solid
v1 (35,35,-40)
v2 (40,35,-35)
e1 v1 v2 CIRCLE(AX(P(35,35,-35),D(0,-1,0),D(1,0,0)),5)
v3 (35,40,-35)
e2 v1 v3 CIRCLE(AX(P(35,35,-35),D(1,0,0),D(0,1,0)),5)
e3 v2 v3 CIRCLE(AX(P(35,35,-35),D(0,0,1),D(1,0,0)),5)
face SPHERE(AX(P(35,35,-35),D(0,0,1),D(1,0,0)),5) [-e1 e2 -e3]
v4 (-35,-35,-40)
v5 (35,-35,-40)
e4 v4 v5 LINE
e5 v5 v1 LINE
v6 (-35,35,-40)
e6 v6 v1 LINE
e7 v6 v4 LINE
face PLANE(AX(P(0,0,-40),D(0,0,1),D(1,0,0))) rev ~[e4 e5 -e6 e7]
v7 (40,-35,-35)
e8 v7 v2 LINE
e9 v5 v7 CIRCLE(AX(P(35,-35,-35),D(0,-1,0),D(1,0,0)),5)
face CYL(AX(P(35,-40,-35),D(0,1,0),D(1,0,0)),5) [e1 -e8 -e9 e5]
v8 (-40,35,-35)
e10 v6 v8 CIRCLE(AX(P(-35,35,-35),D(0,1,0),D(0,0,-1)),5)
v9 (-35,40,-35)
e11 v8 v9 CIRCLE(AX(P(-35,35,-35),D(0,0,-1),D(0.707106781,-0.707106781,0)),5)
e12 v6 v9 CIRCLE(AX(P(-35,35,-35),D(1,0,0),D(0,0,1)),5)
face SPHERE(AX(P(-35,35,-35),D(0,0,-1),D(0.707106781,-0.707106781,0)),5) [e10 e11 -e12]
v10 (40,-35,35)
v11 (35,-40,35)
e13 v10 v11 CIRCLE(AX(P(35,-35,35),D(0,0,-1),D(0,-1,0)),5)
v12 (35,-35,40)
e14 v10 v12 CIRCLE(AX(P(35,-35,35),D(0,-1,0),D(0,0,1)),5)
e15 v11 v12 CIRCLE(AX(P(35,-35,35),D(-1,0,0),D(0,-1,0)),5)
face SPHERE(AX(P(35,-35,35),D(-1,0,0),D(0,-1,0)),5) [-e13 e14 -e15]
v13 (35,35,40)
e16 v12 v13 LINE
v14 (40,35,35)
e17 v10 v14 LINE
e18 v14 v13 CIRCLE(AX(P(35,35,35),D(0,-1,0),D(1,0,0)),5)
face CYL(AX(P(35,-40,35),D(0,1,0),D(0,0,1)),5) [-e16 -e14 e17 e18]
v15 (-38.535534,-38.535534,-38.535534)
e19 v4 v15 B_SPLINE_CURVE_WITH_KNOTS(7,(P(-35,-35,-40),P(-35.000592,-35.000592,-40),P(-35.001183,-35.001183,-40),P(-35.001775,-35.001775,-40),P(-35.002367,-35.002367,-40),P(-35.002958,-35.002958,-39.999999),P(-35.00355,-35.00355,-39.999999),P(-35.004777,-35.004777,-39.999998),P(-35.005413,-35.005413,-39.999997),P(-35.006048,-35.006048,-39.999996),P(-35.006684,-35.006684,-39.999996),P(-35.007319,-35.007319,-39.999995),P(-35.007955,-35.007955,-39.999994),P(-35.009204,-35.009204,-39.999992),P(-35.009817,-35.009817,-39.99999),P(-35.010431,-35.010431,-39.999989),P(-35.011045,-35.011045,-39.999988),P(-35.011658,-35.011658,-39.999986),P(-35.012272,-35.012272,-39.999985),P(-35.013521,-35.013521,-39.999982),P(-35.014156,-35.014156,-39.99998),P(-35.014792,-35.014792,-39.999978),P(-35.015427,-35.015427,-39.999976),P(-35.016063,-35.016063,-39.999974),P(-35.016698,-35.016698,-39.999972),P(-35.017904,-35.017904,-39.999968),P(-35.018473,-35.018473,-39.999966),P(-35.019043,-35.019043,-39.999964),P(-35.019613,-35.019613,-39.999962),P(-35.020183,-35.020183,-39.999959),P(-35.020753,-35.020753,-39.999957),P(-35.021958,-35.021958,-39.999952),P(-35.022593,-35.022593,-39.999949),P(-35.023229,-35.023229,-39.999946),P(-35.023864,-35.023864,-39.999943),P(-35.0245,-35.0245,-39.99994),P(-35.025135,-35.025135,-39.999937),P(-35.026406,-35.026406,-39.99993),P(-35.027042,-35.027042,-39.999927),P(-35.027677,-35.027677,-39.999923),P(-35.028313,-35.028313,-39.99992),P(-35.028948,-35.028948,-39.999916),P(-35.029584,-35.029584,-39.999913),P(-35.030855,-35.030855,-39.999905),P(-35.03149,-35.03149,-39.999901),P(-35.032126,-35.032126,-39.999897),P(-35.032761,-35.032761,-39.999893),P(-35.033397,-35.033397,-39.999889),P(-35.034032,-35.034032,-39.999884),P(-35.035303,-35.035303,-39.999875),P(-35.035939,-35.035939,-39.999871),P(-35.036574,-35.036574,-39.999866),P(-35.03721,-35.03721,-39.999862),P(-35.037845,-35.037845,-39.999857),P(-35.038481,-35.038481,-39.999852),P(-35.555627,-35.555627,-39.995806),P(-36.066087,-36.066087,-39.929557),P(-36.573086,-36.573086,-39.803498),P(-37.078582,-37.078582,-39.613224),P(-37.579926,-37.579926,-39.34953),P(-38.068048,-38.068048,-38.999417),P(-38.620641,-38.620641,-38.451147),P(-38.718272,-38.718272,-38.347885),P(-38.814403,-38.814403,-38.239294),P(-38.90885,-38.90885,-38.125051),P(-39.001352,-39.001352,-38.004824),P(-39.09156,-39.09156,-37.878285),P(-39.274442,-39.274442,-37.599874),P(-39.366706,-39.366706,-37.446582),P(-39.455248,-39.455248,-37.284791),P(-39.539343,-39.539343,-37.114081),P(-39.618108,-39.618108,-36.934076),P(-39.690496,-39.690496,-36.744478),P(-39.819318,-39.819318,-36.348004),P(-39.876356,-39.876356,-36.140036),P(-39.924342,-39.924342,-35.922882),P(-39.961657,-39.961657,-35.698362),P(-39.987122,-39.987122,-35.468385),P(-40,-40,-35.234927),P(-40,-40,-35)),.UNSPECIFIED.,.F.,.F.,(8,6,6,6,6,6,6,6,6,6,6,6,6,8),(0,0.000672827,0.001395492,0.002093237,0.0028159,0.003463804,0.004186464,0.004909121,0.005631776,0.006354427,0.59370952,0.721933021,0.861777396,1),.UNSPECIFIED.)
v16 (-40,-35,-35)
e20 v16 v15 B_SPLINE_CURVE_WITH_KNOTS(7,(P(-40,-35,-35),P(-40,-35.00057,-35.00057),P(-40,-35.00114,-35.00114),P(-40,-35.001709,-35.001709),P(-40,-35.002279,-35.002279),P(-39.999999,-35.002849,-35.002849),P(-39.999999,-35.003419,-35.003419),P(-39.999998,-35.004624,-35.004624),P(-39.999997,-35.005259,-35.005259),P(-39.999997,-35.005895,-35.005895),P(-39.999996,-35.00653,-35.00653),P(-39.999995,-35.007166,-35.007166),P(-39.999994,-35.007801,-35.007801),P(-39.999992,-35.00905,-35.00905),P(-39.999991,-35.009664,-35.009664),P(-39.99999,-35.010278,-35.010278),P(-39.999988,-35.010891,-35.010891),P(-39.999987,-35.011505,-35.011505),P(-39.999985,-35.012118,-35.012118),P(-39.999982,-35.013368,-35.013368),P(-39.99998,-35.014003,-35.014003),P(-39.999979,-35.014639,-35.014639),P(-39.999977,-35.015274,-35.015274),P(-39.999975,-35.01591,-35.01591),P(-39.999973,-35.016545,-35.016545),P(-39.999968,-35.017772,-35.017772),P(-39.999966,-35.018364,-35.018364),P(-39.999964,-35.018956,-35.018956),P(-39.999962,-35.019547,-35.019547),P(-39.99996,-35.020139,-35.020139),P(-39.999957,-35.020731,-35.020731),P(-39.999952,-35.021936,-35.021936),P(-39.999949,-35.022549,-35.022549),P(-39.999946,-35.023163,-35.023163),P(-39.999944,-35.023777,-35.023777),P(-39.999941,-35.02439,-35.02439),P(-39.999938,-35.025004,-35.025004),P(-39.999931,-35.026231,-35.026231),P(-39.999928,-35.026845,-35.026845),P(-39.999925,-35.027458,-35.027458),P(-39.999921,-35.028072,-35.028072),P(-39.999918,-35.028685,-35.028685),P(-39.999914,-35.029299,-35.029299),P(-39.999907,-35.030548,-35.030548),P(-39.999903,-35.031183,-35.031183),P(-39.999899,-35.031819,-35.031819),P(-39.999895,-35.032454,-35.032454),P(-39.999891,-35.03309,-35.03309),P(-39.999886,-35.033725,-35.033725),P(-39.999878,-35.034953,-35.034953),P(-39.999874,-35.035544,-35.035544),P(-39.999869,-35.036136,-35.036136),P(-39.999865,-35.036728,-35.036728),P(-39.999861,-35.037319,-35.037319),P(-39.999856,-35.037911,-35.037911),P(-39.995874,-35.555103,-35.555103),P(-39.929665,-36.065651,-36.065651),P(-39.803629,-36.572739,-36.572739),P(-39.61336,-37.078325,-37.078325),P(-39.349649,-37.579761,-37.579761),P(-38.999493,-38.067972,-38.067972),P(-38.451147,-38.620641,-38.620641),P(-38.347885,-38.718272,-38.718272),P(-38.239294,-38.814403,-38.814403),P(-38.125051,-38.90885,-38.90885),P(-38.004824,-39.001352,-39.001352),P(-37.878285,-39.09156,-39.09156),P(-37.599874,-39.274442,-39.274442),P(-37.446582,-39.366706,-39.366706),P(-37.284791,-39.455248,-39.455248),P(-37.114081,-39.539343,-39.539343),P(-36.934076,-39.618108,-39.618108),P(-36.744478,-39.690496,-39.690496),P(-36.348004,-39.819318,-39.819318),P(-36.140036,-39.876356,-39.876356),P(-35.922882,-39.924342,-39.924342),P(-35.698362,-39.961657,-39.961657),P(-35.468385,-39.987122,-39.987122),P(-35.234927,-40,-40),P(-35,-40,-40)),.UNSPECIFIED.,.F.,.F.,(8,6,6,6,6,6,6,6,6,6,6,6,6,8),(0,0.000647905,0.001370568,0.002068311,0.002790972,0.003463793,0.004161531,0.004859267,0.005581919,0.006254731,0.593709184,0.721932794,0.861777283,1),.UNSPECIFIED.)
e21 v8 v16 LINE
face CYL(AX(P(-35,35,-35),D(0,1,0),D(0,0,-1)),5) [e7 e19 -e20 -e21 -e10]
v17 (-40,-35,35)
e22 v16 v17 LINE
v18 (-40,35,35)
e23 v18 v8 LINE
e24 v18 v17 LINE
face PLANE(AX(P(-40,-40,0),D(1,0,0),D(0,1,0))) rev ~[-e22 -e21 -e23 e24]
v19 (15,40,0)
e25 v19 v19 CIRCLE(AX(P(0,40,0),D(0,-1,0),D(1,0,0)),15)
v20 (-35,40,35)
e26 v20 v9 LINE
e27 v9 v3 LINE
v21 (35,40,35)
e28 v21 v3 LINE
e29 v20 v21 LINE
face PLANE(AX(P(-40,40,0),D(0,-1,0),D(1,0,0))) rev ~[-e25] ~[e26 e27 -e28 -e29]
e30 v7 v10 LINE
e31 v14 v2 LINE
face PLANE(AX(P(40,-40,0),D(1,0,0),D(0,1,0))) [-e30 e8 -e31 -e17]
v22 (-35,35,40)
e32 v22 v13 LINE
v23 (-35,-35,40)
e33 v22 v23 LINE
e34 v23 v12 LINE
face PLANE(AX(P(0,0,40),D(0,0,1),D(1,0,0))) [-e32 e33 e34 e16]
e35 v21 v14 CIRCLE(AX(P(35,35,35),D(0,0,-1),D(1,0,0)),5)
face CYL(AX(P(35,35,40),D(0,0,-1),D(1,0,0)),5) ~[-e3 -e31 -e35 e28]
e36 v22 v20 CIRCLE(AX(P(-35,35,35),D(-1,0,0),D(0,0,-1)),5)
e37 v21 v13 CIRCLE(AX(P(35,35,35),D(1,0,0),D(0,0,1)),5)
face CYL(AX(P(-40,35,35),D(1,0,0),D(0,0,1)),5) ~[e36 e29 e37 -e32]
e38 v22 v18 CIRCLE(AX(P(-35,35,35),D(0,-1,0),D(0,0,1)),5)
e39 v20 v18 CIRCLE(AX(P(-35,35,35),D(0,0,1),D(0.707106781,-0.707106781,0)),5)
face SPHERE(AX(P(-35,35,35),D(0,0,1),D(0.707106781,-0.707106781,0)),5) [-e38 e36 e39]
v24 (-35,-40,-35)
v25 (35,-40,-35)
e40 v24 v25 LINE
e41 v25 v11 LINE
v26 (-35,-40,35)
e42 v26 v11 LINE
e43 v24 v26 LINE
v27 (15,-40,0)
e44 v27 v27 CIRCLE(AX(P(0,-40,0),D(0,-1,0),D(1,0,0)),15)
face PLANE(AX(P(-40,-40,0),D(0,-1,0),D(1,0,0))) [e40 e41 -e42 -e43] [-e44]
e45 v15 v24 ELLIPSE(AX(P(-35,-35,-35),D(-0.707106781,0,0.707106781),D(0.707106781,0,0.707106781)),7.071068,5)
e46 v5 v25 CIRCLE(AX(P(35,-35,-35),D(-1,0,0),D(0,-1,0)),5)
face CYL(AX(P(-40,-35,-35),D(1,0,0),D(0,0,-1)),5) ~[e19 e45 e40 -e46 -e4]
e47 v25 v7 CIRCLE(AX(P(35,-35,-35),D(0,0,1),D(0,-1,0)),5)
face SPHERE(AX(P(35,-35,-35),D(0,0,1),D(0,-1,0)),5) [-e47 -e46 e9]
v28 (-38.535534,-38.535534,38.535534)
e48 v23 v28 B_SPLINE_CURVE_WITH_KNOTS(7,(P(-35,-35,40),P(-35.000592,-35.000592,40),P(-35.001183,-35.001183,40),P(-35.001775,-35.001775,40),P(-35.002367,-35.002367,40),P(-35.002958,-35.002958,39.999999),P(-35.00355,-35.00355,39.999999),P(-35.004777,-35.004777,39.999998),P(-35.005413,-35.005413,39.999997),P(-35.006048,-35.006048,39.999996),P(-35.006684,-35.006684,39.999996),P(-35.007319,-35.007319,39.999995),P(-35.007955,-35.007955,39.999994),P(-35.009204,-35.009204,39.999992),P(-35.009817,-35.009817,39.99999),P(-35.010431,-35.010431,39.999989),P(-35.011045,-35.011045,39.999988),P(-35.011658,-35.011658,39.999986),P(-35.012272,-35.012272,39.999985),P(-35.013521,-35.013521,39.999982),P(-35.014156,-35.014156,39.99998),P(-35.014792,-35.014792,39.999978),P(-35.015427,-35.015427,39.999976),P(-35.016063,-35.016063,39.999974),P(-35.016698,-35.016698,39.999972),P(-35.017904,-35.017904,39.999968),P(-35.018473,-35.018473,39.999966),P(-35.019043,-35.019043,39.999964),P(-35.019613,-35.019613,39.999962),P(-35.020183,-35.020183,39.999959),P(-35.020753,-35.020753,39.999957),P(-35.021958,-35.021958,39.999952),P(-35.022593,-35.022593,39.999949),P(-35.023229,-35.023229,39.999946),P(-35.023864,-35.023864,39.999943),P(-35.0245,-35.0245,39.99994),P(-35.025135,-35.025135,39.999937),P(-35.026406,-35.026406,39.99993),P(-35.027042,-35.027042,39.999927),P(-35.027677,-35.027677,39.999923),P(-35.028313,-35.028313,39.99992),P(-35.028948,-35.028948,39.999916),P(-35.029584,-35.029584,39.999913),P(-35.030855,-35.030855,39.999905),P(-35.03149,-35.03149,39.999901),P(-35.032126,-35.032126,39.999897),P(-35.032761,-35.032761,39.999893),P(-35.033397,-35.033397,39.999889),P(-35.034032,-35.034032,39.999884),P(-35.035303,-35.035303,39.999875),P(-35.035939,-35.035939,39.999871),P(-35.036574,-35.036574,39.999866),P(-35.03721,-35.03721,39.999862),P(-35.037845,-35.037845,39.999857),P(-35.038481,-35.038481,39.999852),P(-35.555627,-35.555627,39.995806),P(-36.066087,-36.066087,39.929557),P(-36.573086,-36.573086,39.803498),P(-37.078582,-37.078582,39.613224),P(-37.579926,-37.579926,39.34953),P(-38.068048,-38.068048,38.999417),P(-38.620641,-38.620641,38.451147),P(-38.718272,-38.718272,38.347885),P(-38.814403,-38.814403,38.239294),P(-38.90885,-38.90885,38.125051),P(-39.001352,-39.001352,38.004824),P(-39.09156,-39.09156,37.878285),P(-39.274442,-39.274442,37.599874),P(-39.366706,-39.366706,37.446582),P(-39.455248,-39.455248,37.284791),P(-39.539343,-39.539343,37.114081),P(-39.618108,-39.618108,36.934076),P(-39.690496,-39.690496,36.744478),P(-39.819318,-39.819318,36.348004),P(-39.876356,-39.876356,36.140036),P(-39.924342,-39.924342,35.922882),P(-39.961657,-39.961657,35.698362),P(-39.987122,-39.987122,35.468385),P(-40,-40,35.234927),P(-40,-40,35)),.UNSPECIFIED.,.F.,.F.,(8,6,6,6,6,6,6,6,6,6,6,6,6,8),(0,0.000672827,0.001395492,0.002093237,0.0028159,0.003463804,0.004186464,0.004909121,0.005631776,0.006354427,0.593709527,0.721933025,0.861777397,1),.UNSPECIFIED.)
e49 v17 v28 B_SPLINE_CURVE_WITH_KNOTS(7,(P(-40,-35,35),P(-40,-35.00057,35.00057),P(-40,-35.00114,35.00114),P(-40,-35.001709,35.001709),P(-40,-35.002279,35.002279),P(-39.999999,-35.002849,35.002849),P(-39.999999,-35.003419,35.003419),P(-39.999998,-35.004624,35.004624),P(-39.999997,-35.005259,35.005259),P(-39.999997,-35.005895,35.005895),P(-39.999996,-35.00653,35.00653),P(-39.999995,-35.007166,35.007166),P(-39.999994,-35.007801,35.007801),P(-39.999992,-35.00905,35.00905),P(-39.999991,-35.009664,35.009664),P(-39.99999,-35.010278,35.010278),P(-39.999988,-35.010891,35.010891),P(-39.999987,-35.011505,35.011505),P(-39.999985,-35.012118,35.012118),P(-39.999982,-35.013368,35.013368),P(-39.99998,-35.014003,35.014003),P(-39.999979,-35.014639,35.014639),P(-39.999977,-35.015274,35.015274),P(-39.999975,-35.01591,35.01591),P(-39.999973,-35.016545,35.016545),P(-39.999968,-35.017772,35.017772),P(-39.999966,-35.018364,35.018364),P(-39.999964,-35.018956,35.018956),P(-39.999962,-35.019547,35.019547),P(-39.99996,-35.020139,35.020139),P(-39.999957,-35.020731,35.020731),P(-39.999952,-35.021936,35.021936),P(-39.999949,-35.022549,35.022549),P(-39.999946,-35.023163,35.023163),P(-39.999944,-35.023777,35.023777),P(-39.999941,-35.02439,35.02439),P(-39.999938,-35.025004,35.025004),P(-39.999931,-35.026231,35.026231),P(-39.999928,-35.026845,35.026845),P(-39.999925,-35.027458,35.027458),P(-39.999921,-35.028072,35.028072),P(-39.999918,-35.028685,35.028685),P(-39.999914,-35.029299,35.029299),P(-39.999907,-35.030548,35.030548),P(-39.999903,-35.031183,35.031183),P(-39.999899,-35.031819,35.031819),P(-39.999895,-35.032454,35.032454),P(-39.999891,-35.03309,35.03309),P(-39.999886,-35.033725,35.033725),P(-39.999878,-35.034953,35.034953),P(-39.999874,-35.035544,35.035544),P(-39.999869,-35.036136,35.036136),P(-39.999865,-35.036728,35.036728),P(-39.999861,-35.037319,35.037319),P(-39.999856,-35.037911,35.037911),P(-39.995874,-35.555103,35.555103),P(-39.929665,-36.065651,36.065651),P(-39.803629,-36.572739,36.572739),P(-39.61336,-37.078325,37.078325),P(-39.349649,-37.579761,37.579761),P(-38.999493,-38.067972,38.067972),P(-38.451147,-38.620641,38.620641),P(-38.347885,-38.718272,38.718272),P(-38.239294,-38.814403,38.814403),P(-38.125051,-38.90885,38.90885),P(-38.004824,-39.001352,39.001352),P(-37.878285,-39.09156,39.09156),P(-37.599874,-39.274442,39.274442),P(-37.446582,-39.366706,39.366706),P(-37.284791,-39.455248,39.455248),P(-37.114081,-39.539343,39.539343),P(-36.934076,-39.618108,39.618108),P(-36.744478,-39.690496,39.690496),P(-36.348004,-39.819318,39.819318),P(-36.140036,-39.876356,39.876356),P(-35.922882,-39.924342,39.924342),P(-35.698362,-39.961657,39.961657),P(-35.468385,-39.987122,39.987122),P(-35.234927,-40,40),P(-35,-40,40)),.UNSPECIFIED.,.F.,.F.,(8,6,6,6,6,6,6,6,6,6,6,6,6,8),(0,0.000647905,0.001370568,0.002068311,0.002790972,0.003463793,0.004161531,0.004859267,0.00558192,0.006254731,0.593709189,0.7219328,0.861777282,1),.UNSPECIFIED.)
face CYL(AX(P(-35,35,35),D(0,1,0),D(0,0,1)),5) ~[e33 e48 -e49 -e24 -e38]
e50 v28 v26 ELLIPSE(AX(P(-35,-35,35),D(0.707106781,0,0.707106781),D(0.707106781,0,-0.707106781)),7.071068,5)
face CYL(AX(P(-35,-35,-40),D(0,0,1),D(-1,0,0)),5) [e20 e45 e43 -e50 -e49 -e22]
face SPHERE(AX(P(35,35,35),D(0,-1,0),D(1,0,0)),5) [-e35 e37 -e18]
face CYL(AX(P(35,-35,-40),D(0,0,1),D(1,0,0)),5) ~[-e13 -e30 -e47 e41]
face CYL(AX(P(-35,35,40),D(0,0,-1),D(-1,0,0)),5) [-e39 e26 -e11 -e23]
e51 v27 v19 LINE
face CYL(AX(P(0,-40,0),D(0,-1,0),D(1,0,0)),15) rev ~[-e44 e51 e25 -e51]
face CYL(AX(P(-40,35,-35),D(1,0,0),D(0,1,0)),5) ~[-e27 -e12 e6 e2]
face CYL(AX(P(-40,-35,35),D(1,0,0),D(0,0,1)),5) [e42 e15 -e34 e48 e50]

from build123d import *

# Parameters (mm, degrees)
F0_W         = 80
F0_H         = 80
F1_DEPTH     = 40
F2_R         = 5
F3_T1_DEPTH  = 82.5
F3_S5_W      = 5.1
F3_S5_H      = 5.1
F3_T6_DEPTH  = 5.1
F3_S11_W     = 5.1
F3_S11_H     = 5.1
F3_T12_DEPTH = 5.1
F4_R         = 15
F5_DEPTH     = 80.001


# Not quite as in the source:
# - a fillet or chamfer that OpenCascade refuses, or shapes differently, is made with other operations: its cross-section is extruded or revolved along the edge and cut away or added


with BuildPart() as f1:
    # F0 (on Top) → F1 (new body, symmetric)
    with BuildSketch(Plane.XY):
        Rectangle(F0_W, F0_H)
    extrude(amount=F1_DEPTH, both=True)

    # F2
    f2_edges = [f1.edges().sort_by_distance(p)[0] for p in [
        (0, -40, 40),
        (-40, -40, 0),
        (40, -40, 0),
        (0, -40, -40),
        (40, 0, 40),
        (40, 40, 0),
        (40, 0, -40),
        (0, 40, 40),
        (-40, 40, 0),
        (0, 40, -40),
    ]]
    fillet(f2_edges, radius=F2_R)

    # F3: fillet of radius 5 on 6 edges, made by hand

    # F3_s2 → F3_t1 (cut)
    with BuildSketch(Plane.XZ.offset(-35)):
        with BuildLine():
            ThreePointArc((-35, 40), (-38.5355339059, 38.5355339059), (-40, 35))
            Line((-40, 35), (-40, 40))
            Line((-40, 40), (-35, 40))
        make_face()
        with BuildLine():
            ThreePointArc((-35, -40), (-38.5355339059, -38.5355339059), (-40, -35))
            Line((-40, -35), (-40, -40))
            Line((-40, -40), (-35, -40))
        make_face()
    extrude(amount=F3_T1_DEPTH, mode=Mode.SUBTRACT)


with BuildPart() as f3_tool4:
    # F3_s5 → F3_t6 (new body)
    with BuildSketch(Plane.XY.offset(-35)):
        with Locations((-37.55, 37.55)):
            Rectangle(F3_S5_W, F3_S5_H)
    extrude(amount=-F3_T6_DEPTH)

    # F3_s7 → F3_t8 (revolve, cut)
    with BuildSketch(Plane(origin=(-35, 35, -35), x_dir=(0.7071067812, -0.7071067812, 0), z_dir=(0.7071067812, 0.7071067812, 0))):
        with BuildLine():
            ThreePointArc((0, -5), (5, 0), (0, 5))
            Line((0, 5), (0, -5))
        make_face()
    revolve(axis=Axis((-35, 35, -35), (0, 0, -1)), mode=Mode.SUBTRACT)


with BuildPart() as f1_1:
    add(f1.part)

    # F3_t3: cut F3_tool4
    add(f3_tool4.part, mode=Mode.SUBTRACT)


with BuildPart() as f3_tool10:
    # F3_s11 → F3_t12 (new body)
    with BuildSketch(Plane.XY.offset(35)):
        with Locations((-37.55, 37.55)):
            Rectangle(F3_S11_W, F3_S11_H)
    extrude(amount=F3_T12_DEPTH)

    # F3_s13 → F3_t14 (revolve, cut)
    with BuildSketch(Plane(origin=(-35, 35, 35), x_dir=(0.7071067812, -0.7071067812, 0), z_dir=(-0.7071067812, -0.7071067812, 0))):
        with BuildLine():
            ThreePointArc((0, -5), (5, 0), (0, 5))
            Line((0, 5), (0, -5))
        make_face()
    revolve(axis=Axis((-35, 35, 35), (0, 0, 1)), mode=Mode.SUBTRACT)


with BuildPart() as f1_2:
    add(f1_1.part)

    # F3_t9: cut F3_tool10
    add(f3_tool10.part, mode=Mode.SUBTRACT)

    # F4 (on face) → F5 (cut, through all)
    with BuildSketch(Plane.XZ.offset(40)):
        Circle(F4_R)
    extrude(amount=-F5_DEPTH, mode=Mode.SUBTRACT)


solid = f1_2.part
